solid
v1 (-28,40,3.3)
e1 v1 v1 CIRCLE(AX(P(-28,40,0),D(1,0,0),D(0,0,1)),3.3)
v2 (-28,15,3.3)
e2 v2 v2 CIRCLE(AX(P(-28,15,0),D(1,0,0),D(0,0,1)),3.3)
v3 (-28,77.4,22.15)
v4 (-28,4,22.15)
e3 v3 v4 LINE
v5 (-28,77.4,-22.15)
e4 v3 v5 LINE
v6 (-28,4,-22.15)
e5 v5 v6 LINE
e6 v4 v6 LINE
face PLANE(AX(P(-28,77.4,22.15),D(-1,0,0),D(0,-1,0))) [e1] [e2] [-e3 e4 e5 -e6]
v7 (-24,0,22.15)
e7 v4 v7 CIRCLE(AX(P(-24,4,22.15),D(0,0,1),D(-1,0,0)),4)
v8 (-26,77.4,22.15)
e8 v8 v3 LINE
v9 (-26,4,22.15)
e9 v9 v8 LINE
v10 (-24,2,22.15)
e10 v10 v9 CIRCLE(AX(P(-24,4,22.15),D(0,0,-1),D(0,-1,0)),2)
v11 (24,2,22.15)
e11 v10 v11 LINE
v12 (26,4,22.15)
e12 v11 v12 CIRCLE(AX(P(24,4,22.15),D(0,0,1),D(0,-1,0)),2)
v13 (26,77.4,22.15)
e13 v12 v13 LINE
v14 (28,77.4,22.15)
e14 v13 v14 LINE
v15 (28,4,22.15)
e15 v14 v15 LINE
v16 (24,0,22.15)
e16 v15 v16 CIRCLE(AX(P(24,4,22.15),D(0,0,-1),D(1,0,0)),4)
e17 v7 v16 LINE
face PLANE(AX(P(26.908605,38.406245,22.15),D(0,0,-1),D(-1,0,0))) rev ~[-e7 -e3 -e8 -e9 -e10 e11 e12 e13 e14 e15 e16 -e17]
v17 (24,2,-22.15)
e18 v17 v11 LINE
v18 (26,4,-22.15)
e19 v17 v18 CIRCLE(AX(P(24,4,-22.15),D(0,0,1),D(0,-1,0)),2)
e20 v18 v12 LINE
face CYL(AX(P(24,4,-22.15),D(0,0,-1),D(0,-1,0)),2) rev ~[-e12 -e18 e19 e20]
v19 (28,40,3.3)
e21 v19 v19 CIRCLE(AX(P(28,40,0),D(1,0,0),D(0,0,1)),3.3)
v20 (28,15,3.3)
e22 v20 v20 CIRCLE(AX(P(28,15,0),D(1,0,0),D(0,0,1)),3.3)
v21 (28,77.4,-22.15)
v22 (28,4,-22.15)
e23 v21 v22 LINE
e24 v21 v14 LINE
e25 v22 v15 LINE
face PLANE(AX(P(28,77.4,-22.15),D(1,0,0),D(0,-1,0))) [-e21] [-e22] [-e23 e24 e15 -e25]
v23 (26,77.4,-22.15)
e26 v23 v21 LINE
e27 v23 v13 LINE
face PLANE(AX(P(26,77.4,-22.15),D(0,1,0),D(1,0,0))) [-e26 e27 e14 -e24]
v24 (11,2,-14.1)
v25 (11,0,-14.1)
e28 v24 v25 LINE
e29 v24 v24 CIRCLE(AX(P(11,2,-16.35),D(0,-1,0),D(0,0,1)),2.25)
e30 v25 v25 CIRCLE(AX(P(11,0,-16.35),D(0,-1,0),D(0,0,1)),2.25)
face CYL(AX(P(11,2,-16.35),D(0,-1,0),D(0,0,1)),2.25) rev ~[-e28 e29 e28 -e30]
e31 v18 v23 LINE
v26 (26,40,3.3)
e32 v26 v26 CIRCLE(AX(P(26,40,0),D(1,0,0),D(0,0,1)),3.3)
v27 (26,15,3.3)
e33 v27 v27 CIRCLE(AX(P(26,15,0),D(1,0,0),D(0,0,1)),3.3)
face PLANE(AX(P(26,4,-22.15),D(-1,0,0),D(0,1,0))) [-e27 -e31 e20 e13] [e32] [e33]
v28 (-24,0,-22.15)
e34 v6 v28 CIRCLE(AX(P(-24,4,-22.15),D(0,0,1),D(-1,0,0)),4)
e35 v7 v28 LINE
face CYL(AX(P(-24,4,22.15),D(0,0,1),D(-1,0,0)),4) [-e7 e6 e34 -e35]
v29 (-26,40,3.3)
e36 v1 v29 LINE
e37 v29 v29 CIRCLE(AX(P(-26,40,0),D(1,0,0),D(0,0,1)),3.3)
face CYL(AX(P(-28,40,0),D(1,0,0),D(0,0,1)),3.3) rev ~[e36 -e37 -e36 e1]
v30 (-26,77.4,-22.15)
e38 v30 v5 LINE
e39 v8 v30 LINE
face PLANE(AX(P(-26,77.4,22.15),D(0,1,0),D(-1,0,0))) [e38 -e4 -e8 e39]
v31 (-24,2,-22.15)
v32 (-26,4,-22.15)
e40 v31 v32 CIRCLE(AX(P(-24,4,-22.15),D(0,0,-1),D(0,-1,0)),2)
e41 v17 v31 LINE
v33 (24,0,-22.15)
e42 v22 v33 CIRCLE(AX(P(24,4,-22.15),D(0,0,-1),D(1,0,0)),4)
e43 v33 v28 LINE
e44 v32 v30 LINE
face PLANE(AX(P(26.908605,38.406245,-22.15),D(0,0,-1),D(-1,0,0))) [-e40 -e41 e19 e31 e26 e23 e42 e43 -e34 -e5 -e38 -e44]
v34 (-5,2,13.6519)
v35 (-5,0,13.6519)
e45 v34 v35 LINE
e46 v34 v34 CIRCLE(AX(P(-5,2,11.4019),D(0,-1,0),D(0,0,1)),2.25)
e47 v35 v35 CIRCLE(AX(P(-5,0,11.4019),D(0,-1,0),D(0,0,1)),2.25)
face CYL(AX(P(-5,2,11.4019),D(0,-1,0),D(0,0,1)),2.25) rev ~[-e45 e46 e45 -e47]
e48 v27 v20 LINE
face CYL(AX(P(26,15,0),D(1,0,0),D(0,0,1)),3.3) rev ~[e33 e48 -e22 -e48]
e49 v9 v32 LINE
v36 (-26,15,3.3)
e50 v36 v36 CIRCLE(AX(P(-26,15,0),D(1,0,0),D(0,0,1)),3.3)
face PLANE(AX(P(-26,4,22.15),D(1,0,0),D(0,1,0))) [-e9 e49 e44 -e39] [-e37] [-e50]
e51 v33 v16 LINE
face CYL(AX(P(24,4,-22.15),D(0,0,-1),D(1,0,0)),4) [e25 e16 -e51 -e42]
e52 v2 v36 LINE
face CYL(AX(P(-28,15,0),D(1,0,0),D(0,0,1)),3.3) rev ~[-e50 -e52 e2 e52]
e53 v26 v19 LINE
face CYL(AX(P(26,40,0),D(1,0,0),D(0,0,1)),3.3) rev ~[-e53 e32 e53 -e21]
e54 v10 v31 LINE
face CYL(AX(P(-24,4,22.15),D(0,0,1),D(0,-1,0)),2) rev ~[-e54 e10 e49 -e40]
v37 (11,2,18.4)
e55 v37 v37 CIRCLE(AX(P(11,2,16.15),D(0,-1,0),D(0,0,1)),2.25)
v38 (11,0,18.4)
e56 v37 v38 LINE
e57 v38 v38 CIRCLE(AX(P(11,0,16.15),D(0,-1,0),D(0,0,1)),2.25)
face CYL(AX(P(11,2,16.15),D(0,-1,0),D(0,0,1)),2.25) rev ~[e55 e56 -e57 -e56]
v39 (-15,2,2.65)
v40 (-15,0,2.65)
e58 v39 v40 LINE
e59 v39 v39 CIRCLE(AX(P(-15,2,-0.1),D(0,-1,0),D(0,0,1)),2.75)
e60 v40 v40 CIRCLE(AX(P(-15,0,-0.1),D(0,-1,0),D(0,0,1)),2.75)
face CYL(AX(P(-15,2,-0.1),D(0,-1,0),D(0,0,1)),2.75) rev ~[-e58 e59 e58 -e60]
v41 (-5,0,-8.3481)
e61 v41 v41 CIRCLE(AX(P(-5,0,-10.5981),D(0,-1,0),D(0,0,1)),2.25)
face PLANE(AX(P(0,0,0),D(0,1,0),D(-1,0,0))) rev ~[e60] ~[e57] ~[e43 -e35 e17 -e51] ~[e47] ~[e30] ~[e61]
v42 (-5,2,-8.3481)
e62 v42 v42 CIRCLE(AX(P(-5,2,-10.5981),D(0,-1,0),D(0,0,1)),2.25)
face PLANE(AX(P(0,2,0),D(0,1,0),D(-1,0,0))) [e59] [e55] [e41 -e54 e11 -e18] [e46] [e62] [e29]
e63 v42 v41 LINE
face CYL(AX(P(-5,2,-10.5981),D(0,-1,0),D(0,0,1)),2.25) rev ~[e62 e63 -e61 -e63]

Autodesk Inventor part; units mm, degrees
ref_plane "YZ Plane" through (0, 0, 0) normal (1, 0, 0) x (0, 1, 0)
ref_plane "XZ Plane" through (0, 0, 0) normal (0, 1, 0) x (-1, 0, 0)
ref_plane "XY Plane" through (0, 0, 0) normal (0, 0, 1) x (1, 0, 0)
sketch "Szkic1" plane through (0, 0, 0) normal (0, 1, 0) x (-1, 0, 0)
  line L0 (-28, -22.15) -> (28, -22.15)
  line L1 (28, -22.15) -> (28, 22.15)
  line L2 (28, 22.15) -> (-28, 22.15)
  line L3 (-28, 22.15) -> (-28, -22.15)
  line L4 (-28, -22.15) -> (28, 22.15) construction
  line L5 (28, -22.15) -> (-28, 22.15) construction
  point P0 (0, 0)
  dimension "d0" = 56
  dimension "d1" = 44.3
extrude "Płyta1" add sketch "Szkic1" along normal blind 2
sketch "Szkic4" plane through (26, 0, -22.15) normal (1, 0, 0) x (0, 1, 0)
  line L0 (0, 44.3) -> (0, 0)
  line L1 (0, 0) -> (77.4, 0)
  line L2 (77.4, 0) -> (77.4, 44.3)
  line L3 (77.4, 44.3) -> (0, 44.3)
edge flange "Kołnierz3" height 77.4 angle 90 thickness 2 bend radius 2 thickness toward (1, 0, 0) relief tear relief width 2 relief depth 1 corner gap 2 corner form 0 edges at (28, 2, 0) (-28, 2, 0) wall of the first edge with corners at (26, 0, 22.15) (26, 0, -22.15) (26, 77.4, -22.15) (26, 77.4, 22.15)
bend "Zagięcie3"
corner "Narożnik3"
sketch "Szkic9" plane through (-28, 77.4, -22.15) normal (-1, 0, 0) x (0, 0, 1)
  point P0 (22.15, -37.4)
  point P1 (22.15, -62.4)
hole "Otwór4" at (-28, 40, 0) at (-28, 15, 0) direction (1, 0, 0) diameter 6.6 depth 2
sketch "Szkic10" plane through (26, 77.4, -22.15) normal (-1, 0, 0) x (0, 0, 1)
  point P0 (22.15, -37.4)
  point P1 (22.15, -62.4)
hole "Otwór5" at (26, 40, 0) at (26, 15, 0) direction (1, 0, 0) diameter 6.6 depth 2
sketch "Szkic11" plane through (0, 2, 0) normal (0, 1, 0) x (1, 0, 0)
  point P0 (11, -16.15)
  point P1 (11, 16.35)
hole "Otwór6" at (11, 2, 16.15) at (11, 2, -16.35) direction (0, -1, 0) diameter 4.5 end through all
sketch "Szkic12" plane through (0, 2, 0) normal (0, 1, 0) x (1, 0, 0)
  point P0 (-5, 10.5981)
  point P1 (-5, -11.4019)
hole "Otwór7" at (-5, 2, -10.5981) at (-5, 2, 11.4019) direction (0, -1, 0) diameter 4.5 end through all
sketch "Szkic13" plane through (0, 2, 0) normal (0, 1, 0) x (1, 0, 0)
  point P0 (-15, 0.1)
hole "Otwór8" at (-15, 2, -0.1) direction (0, -1, 0) diameter 5.5 end through all
equation "\"d2\" = Grubość"
equation "\"d23\" = SzerokośćGięciaPodcięcia"
equation "\"d24\" = GłębokośćGięciaPodcięcia"
equation "\"d25\" = MinimalnaPozostałość"
equation "\"d26\" = PromieńPrzejścia"
equation "\"d29\" = PromieńGięcia"
equation "\"d30\" = RozmiarPodcięciaNarożnika"
equation "\"d31\" = Wielk_odstępu"
equation "\"d32\" = Rozmiar_promienia_Jacobiego"
equation "\"PromieńGięcia\" = Grubość"
equation "\"SzerokośćGięciaPodcięcia\" = Grubość"
equation "\"GłębokośćGięciaPodcięcia\" = 0.5 * Grubość"
equation "\"RozmiarPodcięciaNarożnika\" = 4 * Grubość"
equation "\"MinimalnaPozostałość\" = 2 * Grubość"
equation "\"PromieńPrzejścia\" = PromieńGięcia"
equation "\"Rozmiar_promienia_Jacobiego\" = PromieńGięcia"
equation "\"Wielk_odstępu\" = Grubość"
equation "\"Grubość\" = 2"
properties part number "RR-PCSS-W3M2" material "Stal nierdzewna"
